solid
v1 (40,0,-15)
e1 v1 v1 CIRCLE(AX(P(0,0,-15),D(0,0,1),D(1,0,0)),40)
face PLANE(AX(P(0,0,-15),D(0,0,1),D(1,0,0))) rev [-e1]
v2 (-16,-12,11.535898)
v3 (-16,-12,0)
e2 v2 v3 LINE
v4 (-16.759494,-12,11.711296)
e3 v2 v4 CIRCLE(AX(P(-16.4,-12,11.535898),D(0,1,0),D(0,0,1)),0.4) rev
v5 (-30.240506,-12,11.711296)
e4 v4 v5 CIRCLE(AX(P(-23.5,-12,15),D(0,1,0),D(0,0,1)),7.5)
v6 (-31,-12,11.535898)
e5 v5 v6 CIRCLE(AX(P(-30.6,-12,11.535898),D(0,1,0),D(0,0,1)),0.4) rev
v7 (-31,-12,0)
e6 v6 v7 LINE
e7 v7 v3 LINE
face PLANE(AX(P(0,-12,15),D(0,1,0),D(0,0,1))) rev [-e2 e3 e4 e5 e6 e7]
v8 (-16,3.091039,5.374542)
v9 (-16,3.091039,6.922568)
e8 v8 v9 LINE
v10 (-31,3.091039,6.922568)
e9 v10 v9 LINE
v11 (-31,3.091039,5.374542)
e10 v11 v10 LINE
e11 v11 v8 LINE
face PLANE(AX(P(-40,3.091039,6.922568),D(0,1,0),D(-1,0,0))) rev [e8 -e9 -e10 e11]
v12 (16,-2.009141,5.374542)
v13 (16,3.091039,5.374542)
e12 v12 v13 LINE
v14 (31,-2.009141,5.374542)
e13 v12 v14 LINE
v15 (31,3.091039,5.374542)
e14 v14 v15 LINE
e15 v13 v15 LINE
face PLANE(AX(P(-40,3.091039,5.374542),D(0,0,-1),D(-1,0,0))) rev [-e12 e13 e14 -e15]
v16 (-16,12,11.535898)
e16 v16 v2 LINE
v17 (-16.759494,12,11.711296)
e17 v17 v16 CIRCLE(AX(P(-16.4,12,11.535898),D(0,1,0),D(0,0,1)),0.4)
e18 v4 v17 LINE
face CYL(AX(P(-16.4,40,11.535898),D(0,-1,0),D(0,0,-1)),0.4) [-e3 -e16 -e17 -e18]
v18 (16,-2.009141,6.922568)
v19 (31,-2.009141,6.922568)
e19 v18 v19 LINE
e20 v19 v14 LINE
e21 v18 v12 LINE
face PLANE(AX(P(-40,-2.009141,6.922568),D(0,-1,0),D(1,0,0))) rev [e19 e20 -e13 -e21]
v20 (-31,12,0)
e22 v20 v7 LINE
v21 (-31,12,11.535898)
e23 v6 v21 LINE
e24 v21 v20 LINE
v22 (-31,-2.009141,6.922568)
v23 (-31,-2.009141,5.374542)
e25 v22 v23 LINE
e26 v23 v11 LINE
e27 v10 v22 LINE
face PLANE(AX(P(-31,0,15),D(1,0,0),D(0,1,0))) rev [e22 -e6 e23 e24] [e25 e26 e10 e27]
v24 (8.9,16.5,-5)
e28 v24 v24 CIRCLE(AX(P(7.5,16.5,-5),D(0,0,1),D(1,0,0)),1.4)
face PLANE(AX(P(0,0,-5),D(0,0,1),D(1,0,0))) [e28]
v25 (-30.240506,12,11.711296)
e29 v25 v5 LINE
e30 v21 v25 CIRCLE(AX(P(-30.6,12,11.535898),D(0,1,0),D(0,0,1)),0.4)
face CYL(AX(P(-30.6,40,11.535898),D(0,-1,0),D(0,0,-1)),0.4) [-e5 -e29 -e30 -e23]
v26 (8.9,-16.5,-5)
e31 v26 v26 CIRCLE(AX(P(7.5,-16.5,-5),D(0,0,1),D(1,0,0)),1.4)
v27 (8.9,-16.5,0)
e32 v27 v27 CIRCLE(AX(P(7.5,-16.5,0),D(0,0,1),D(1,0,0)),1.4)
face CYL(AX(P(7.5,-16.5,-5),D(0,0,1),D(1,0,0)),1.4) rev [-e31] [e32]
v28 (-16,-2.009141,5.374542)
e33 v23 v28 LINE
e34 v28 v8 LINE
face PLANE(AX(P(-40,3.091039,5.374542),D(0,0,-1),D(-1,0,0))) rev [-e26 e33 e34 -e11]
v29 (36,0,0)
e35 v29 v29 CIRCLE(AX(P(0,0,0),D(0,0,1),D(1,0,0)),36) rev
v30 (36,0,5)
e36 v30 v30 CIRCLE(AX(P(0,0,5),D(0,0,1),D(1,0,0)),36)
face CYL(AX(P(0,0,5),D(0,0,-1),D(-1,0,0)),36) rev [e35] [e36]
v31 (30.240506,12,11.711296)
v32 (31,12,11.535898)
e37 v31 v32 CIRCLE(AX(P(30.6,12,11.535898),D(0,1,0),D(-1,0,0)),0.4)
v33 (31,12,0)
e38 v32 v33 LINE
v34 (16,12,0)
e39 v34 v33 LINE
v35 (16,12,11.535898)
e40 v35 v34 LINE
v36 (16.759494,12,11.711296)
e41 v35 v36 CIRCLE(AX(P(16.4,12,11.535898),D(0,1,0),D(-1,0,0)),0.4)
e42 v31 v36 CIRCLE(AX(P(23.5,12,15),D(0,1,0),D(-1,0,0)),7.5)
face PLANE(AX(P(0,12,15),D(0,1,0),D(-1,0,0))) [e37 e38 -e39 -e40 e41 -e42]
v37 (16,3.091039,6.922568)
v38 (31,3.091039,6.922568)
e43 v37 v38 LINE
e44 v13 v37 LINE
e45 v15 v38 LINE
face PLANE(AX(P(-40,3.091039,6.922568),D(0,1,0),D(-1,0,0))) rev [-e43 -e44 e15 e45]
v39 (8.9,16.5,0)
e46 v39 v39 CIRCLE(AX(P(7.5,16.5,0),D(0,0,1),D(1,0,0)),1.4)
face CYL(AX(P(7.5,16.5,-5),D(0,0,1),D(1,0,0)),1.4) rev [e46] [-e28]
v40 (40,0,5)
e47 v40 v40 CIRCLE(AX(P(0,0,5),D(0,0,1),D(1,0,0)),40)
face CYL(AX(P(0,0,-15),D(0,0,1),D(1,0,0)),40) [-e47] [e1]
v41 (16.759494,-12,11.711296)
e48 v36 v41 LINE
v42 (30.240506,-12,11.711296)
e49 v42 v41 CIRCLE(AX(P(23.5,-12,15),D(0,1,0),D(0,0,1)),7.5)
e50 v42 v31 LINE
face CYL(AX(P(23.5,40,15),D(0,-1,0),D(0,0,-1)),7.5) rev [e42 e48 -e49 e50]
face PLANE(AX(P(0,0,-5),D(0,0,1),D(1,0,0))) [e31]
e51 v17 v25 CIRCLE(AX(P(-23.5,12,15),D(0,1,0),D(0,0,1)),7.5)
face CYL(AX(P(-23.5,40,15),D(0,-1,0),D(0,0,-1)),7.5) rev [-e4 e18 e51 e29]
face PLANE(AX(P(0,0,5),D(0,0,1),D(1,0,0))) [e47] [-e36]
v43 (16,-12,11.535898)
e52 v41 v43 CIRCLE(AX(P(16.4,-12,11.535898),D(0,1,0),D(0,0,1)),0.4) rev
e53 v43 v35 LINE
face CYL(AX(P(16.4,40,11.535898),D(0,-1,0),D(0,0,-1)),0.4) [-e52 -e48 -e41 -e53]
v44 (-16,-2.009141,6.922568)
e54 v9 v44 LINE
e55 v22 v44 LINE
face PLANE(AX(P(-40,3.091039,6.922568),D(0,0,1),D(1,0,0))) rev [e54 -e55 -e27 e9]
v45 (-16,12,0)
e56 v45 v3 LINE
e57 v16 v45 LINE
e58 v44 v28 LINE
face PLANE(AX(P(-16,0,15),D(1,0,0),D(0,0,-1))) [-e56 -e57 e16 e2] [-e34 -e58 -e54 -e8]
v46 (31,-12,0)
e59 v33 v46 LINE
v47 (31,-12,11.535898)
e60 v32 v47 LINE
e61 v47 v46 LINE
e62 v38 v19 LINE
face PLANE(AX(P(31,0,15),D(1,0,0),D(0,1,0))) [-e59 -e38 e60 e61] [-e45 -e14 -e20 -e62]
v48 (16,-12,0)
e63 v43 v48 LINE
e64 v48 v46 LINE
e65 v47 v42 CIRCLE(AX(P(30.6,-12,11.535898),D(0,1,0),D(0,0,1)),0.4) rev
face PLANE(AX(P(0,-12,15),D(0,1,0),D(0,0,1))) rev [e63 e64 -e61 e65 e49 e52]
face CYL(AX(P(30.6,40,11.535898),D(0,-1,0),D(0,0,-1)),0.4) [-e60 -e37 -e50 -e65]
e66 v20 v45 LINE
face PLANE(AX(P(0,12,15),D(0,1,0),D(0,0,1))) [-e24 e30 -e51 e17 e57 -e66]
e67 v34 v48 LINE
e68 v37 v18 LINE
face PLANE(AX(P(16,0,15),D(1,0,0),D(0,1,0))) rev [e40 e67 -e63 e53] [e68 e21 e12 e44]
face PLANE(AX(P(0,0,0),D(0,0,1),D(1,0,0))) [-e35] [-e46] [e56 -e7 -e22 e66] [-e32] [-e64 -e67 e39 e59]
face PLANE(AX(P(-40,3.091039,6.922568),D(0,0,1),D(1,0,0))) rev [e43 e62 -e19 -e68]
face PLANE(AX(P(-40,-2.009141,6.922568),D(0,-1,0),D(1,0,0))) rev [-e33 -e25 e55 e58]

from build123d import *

# Parameters (mm, degrees)
SKETCH_1_R               = 40
EXTRUDE_4_DEPTH          = 15
SKETCH_1_8_W             = 15
SKETCH_1_8_H             = 24
EXTRUDE_5_DEPTH          = 15
EXTRUDE_START            = 5
SKETCH_1_9_R             = 40
SKETCH_1_9_R_2           = 36
EXTRUDE_6_DEPTH          = 5
CUT_EXTRUDE_1_DEPTH      = 68.297845434
CUT_EXTRUDE_1_DEPTH_BACK = 68.297845434
SKETCH_2_R               = 7.5
FILLET_START             = -13
FILLET_1_DEPTH           = 26
CUT_EXTRUDE_2_DEPTH      = 83.861329943
CUT_EXTRUDE_2_DEPTH_BACK = 83.861329943
SKETCH_3_W               = 1.548025895
SKETCH_3_H               = 5.100179719
SKETCH_4_R               = 1.5
CUT_EXTRUDE_3_DEPTH      = 5
EXTRUDE_8_DEPTH          = 5
SKETCH_5_4_R             = 1.4
CUT_EXTRUDE_4_DEPTH      = 5


with BuildPart() as part:
    # 스케치1 → 보스-돌출4 (new body)
    with BuildSketch(Plane.XY):
        Circle(SKETCH_1_R)
    extrude(amount=-EXTRUDE_4_DEPTH)

    # 스케치1<8> → 보스-돌출5 (add)
    with BuildSketch(Plane.XY):
        with Locations((-23.5, 0)):
            Rectangle(SKETCH_1_8_W, SKETCH_1_8_H)
        with Locations((23.5, 0)):
            Rectangle(SKETCH_1_8_W, SKETCH_1_8_H)
    extrude(amount=EXTRUDE_5_DEPTH)

    # 스케치1<9> → 보스-돌출6 (add)
    with BuildSketch(Plane.XY.offset(EXTRUDE_START)):
        Circle(SKETCH_1_9_R)
        Circle(SKETCH_1_9_R_2, mode=Mode.SUBTRACT)
    extrude(amount=-EXTRUDE_6_DEPTH)

    # 스케치2 → 컷-돌출1 (cut, two sides: drawn at the far end of the back side and taken through both)
    with BuildSketch(Plane.XZ.offset(12).offset(-CUT_EXTRUDE_1_DEPTH_BACK)):
        with Locations((-23.5, 15)):
            Circle(SKETCH_2_R)
        with Locations((23.5, 15)):
            Circle(SKETCH_2_R)
    extrude(amount=CUT_EXTRUDE_1_DEPTH + CUT_EXTRUDE_1_DEPTH_BACK, mode=Mode.SUBTRACT)

    # 필렛1: read off the stored shape, not the designer's step
    # 필렛1 outline → 필렛1 (cut)
    with BuildSketch(Plane(origin=(0, 0, 0), x_dir=(1, 0, 0), z_dir=(0, 1, 0)).offset(FILLET_START)):
        with BuildLine():
            Line((31, -15), (31, -11.535898385))
            ThreePointArc((31, -11.535898385), (30.690007032, -11.925640266), (30.240506329, -11.711295935))
            ThreePointArc((30.240506329, -11.711295935), (30.807660278, -13.312368149), (31, -15))
        make_face()
        with BuildLine():
            ThreePointArc((16, -15), (16.192339722, -13.312368149), (16.759493671, -11.711295935))
            ThreePointArc((16.759493671, -11.711295935), (16.309992968, -11.925640266), (16, -11.535898385))
            Line((16, -11.535898385), (16, -15))
        make_face()
        with BuildLine():
            Line((-16, -15), (-16, -11.535898385))
            ThreePointArc((-16, -11.535898385), (-16.309992968, -11.925640266), (-16.759493671, -11.711295935))
            ThreePointArc((-16.759493671, -11.711295935), (-16.192339722, -13.312368149), (-16, -15))
        make_face()
        with BuildLine():
            ThreePointArc((-31, -15), (-30.807660278, -13.312368149), (-30.240506329, -11.711295935))
            ThreePointArc((-30.240506329, -11.711295935), (-30.690007032, -11.925640266), (-31, -11.535898385))
            Line((-31, -11.535898385), (-31, -15))
        make_face()
    extrude(amount=FILLET_1_DEPTH, mode=Mode.SUBTRACT)

    # 스케치3 → 컷-돌출2 (cut, two sides: drawn at the far end of the back side and taken through both)
    with BuildSketch(Plane(origin=(31, 0, 0), x_dir=(0, 0, -1), z_dir=(1, 0, 0)).offset(-CUT_EXTRUDE_2_DEPTH_BACK)):
        with Locations((-6.14855499, 0.540949065)):
            Rectangle(SKETCH_3_W, SKETCH_3_H)
    extrude(amount=CUT_EXTRUDE_2_DEPTH + CUT_EXTRUDE_2_DEPTH_BACK, mode=Mode.SUBTRACT)

    # 스케치4 → 컷-돌출3 (cut)
    with BuildSketch(Plane.XY):
        with Locations((7.5, 15)):
            Circle(SKETCH_4_R)
        with Locations((7.5, -15)):
            Circle(SKETCH_4_R)
    extrude(amount=-CUT_EXTRUDE_3_DEPTH, mode=Mode.SUBTRACT)

    # 스케치5 → 보스-돌출8 (add)
    with BuildSketch(Plane.XY):
        with BuildLine():
            Line((7.5, 15.1), (7.5, 15))
            Line((7.5, 15), (7.5, 13.5))
            ThreePointArc((7.5, 13.5), (8.560660172, 13.939339828), (9, 15))
            ThreePointArc((9, 15), (8.933057899, 15.443108405), (8.738206588, 15.846666667))
            ThreePointArc((8.738206588, 15.846666667), (8.222956891, 15.301111626), (7.5, 15.1))
        make_face()
        with BuildLine():
            Line((7.5, 13.5), (7.5, 15))
            Line((7.5, 15), (7.5, 15.1))
            ThreePointArc((7.5, 15.1), (6.777043109, 15.301111626), (6.261793412, 15.846666667))
            ThreePointArc((6.261793412, 15.846666667), (6.173350084, 14.3), (7.5, 13.5))
        make_face()
        with BuildLine():
            ThreePointArc((6.261793412, 15.846666667), (6.777043109, 15.301111626), (7.5, 15.1))
            Line((7.5, 15.1), (7.5, 16.5))
            ThreePointArc((7.5, 16.5), (6.8, 16.326649916), (6.261793412, 15.846666667))
        make_face()
        with BuildLine():
            Line((7.5, 16.5), (7.5, 15.1))
            ThreePointArc((7.5, 15.1), (8.222956891, 15.301111626), (8.738206588, 15.846666667))
            ThreePointArc((8.738206588, 15.846666667), (8.2, 16.326649916), (7.5, 16.5))
        make_face()
        with BuildLine():
            ThreePointArc((9, -15), (8.560660172, -13.939339828), (7.5, -13.5))
            Line((7.5, -13.5), (7.5, -15))
            Line((7.5, -15), (7.5, -15.1))
            ThreePointArc((7.5, -15.1), (8.222956891, -15.301111626), (8.738206588, -15.846666667))
            ThreePointArc((8.738206588, -15.846666667), (8.933057899, -15.443108405), (9, -15))
        make_face()
        with BuildLine():
            Line((7.5, -15), (7.5, -13.5))
            ThreePointArc((7.5, -13.5), (6.173350084, -14.3), (6.261793412, -15.846666667))
            ThreePointArc((6.261793412, -15.846666667), (6.777043109, -15.301111626), (7.5, -15.1))
            Line((7.5, -15.1), (7.5, -15))
        make_face()
        with BuildLine():
            ThreePointArc((7.5, -15.1), (6.777043109, -15.301111626), (6.261793412, -15.846666667))
            ThreePointArc((6.261793412, -15.846666667), (6.8, -16.326649916), (7.5, -16.5))
            Line((7.5, -16.5), (7.5, -15.1))
        make_face()
        with BuildLine():
            ThreePointArc((8.738206588, -15.846666667), (8.222956891, -15.301111626), (7.5, -15.1))
            Line((7.5, -15.1), (7.5, -16.5))
            ThreePointArc((7.5, -16.5), (8.2, -16.326649916), (8.738206588, -15.846666667))
        make_face()
    extrude(amount=-EXTRUDE_8_DEPTH)

    # 스케치5<4> → 컷-돌출4 (cut)
    with BuildSketch(Plane.XY):
        with Locations((7.5, 16.5)):
            Circle(SKETCH_5_4_R)
        with Locations((7.5, -16.5)):
            Circle(SKETCH_5_4_R)
    extrude(amount=-CUT_EXTRUDE_4_DEPTH, mode=Mode.SUBTRACT)


solid = part.part
